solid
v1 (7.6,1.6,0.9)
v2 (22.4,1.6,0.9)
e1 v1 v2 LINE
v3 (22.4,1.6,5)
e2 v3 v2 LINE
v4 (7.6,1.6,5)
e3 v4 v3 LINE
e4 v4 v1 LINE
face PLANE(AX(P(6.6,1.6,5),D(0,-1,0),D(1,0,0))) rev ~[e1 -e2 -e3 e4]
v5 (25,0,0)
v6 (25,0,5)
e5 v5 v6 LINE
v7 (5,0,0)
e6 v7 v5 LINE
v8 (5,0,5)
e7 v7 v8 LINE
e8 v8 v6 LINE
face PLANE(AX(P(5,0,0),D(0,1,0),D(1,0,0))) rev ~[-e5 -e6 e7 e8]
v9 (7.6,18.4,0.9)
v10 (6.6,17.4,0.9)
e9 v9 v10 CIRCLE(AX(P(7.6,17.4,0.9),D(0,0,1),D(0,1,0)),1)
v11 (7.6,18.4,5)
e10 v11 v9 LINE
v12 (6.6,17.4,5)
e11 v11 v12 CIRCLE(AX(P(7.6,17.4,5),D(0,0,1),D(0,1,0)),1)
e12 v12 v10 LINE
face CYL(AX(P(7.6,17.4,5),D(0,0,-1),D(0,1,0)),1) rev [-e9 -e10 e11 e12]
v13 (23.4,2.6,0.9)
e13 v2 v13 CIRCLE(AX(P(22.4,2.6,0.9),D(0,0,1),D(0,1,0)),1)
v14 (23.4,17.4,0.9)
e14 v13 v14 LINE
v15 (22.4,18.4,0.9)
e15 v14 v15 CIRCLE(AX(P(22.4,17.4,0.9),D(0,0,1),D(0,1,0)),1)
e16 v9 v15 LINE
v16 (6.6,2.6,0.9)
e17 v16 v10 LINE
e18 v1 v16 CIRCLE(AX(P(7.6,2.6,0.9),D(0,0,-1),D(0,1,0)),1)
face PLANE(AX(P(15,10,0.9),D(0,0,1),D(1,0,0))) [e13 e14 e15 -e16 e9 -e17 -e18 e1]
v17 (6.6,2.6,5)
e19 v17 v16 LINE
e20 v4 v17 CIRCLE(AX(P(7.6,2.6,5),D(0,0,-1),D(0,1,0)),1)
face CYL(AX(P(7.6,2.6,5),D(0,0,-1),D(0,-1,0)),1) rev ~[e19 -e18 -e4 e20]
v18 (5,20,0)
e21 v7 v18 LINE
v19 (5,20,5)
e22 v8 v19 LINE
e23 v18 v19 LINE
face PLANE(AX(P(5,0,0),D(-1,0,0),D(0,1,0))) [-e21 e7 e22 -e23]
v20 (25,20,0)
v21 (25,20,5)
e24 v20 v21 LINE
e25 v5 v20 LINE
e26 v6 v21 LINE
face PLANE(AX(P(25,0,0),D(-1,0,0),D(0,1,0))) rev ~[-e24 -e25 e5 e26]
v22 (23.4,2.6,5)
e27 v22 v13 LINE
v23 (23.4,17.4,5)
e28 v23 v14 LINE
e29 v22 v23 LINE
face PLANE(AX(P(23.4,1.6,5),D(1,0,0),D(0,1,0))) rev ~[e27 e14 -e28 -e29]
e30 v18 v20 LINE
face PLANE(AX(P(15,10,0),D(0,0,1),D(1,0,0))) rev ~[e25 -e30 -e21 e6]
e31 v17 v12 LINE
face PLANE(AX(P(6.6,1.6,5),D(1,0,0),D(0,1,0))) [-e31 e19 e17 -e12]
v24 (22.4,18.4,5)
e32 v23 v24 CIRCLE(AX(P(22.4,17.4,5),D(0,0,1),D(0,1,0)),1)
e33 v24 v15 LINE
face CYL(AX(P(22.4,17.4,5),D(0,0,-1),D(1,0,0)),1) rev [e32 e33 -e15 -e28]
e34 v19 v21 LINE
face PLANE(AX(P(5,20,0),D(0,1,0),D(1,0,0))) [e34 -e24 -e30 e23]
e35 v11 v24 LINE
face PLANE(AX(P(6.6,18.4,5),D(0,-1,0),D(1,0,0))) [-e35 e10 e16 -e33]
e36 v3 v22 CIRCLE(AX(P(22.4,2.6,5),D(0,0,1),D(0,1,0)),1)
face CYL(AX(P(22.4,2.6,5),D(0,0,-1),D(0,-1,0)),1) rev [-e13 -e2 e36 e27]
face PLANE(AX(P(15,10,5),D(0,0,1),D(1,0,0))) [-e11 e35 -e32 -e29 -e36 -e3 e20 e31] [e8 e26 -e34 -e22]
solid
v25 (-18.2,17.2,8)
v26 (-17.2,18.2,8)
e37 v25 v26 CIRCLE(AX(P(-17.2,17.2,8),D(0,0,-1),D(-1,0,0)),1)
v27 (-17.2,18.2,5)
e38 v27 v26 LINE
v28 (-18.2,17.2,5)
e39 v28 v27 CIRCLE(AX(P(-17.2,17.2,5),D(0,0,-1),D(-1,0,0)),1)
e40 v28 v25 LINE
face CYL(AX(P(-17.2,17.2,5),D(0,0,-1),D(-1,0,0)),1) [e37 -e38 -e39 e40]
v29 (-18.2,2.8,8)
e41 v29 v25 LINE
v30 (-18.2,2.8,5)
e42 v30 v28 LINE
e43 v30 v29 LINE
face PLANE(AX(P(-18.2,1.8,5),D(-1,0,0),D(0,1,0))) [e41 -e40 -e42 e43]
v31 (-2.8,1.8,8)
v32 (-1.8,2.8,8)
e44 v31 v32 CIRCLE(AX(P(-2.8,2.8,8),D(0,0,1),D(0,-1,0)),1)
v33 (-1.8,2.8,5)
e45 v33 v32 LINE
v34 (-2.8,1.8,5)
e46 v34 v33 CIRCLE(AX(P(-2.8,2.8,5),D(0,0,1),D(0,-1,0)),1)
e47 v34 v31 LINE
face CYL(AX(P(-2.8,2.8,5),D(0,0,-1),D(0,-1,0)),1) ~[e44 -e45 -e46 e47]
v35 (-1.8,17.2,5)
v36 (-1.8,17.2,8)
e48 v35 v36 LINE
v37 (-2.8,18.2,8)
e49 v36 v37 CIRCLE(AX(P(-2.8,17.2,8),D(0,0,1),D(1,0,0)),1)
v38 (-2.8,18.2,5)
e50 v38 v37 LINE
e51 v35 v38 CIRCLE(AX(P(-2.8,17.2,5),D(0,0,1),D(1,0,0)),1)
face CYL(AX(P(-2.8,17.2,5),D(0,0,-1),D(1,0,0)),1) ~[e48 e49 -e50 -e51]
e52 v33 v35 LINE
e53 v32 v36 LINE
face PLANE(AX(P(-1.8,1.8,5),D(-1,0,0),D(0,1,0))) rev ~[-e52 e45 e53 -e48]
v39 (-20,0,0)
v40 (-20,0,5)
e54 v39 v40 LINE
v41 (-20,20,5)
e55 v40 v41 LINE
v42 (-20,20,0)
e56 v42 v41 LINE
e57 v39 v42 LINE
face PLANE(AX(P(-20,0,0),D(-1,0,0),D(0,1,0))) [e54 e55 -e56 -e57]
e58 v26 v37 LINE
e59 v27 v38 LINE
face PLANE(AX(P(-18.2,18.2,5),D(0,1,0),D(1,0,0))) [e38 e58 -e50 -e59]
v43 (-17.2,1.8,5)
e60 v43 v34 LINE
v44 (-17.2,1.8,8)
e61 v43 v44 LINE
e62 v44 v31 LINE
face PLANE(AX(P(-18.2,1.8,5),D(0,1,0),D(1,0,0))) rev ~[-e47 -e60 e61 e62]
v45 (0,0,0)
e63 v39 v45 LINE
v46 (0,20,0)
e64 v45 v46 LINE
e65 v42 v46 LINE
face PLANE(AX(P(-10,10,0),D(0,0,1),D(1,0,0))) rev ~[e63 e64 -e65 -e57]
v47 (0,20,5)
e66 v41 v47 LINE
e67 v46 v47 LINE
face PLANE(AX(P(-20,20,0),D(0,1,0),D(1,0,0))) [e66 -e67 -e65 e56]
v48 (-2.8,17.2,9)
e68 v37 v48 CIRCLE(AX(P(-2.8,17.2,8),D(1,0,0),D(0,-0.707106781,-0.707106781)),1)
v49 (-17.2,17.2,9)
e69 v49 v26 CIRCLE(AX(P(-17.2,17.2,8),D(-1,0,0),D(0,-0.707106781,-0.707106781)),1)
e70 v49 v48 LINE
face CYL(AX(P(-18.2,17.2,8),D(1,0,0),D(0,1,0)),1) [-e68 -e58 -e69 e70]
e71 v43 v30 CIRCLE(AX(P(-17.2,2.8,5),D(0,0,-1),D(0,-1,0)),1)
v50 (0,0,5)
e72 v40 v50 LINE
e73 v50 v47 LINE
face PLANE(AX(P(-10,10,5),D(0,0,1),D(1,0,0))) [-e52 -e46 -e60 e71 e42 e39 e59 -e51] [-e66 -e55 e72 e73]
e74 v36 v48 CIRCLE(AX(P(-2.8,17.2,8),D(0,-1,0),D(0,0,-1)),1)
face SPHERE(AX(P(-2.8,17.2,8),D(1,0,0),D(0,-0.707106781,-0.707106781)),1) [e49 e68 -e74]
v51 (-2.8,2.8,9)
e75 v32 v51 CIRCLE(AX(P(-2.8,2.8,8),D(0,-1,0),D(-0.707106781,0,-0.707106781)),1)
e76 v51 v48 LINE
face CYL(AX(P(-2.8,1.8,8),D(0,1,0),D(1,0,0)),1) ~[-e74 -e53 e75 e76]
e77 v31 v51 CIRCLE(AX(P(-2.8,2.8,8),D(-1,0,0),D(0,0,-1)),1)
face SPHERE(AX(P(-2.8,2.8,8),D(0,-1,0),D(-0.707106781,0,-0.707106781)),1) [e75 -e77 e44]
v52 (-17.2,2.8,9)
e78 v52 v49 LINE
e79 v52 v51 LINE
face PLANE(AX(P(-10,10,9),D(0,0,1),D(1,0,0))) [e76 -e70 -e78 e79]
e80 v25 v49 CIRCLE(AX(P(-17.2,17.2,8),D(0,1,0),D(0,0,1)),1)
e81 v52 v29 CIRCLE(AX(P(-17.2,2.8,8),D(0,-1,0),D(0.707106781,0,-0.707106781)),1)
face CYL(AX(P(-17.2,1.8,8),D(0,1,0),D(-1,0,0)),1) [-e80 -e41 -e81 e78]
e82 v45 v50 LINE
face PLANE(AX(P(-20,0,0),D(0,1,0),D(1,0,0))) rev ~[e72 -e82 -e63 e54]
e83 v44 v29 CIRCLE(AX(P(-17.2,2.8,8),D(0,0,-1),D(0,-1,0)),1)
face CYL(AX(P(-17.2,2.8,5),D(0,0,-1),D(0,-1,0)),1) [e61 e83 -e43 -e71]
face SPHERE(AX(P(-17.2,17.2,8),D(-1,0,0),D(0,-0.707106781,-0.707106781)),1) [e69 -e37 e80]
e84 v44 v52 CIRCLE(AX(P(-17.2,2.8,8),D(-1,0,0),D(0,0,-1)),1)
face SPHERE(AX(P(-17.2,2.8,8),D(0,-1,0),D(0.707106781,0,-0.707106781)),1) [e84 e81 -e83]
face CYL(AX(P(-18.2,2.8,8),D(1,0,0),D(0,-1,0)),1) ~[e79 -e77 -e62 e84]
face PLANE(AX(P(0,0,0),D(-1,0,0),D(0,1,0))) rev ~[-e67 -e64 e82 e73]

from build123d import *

# Parameters (mm, degrees)
F0_W         = 20
F0_H         = 20
F1_DEPTH     = 5
F2_W         = 16.4
F2_H         = 16.4
F3_DEPTH     = 4
F4_R         = 1
F5_W         = 20
F5_H         = 20
F6_DEPTH     = 5
F7_W         = 16.8
F7_H         = 16.8
F8_DEPTH     = 4.1
F9_T1_DEPTH  = 3
F9_S5_W      = 1
F9_S5_H      = 1
F9_T6_DEPTH  = 1
F9_S11_W     = 1
F9_S11_H     = 1
F9_T12_DEPTH = 1
F9_S17_W     = 1
F9_S17_H     = 1
F9_T18_DEPTH = 1
F9_S23_W     = 1
F9_S23_H     = 1
F9_T24_DEPTH = 1
F10_R        = 1


# Not quite as in the source:
# - a fillet or chamfer that OpenCascade refuses, or shapes differently, is made with other operations: its cross-section is extruded or revolved along the edge and cut away or added


with BuildPart() as f1:
    # F0 (on Top) → F1 (new body)
    with BuildSketch(Plane.XY):
        with Locations((-10, 10)):
            Rectangle(F0_W, F0_H)
    extrude(amount=F1_DEPTH)

    # F2 (on face) → F3 (join)
    with BuildSketch(Plane.XY.offset(5)):
        with Locations((-10, 10)):
            Rectangle(F2_W, F2_H)
    extrude(amount=F3_DEPTH)

    # F4
    f4_edges = [f1.edges().sort_by_distance(p)[0] for p in [
        (-10, 1.8, 9),
        (-1.8, 10, 9),
        (-10, 18.2, 9),
        (-18.2, 10, 9),
    ]]
    fillet(f4_edges, radius=F4_R)

    # F9: fillet of radius 1 on 4 edges, made by hand

    # F9_s2 → F9_t1 (cut)
    with BuildSketch(Plane.XY.offset(5)):
        with BuildLine():
            ThreePointArc((-1.8, 17.2), (-2.0928932188, 17.9071067812), (-2.8, 18.2))
            Line((-2.8, 18.2), (-1.8, 18.2))
            Line((-1.8, 18.2), (-1.8, 17.2))
        make_face()
        with BuildLine():
            ThreePointArc((-2.8, 1.8), (-2.0928932188, 2.0928932188), (-1.8, 2.8))
            Line((-1.8, 2.8), (-1.8, 1.8))
            Line((-1.8, 1.8), (-2.8, 1.8))
        make_face()
        with BuildLine():
            ThreePointArc((-17.2, 1.8), (-17.9071067812, 2.0928932188), (-18.2, 2.8))
            Line((-18.2, 2.8), (-18.2, 1.8))
            Line((-18.2, 1.8), (-17.2, 1.8))
        make_face()
        with BuildLine():
            ThreePointArc((-18.2, 17.2), (-17.9071067812, 17.9071067812), (-17.2, 18.2))
            Line((-17.2, 18.2), (-18.2, 18.2))
            Line((-18.2, 18.2), (-18.2, 17.2))
        make_face()
    extrude(amount=F9_T1_DEPTH, mode=Mode.SUBTRACT)


with BuildPart() as f6:
    # F5 (on Top) → F6 (new body)
    with BuildSketch(Plane.XY):
        with Locations((15, 10)):
            Rectangle(F5_W, F5_H)
    extrude(amount=F6_DEPTH)

    # F7 (on face) → F8 (cut)
    with BuildSketch(Plane.XY.offset(5)):
        with Locations((15, 10)):
            Rectangle(F7_W, F7_H)
    extrude(amount=-F8_DEPTH, mode=Mode.SUBTRACT)

    # F10
    f10_edges = [f6.edges().sort_by_distance(p)[0] for p in [
        (6.6, 18.4, 2.95),
        (23.4, 18.4, 2.95),
        (23.4, 1.6, 2.95),
        (6.6, 1.6, 2.95),
    ]]
    fillet(f10_edges, radius=F10_R)


with BuildPart() as f9_tool4:
    # F9_s5 → F9_t6 (new body)
    with BuildSketch(Plane.YZ.offset(-17.2)):
        with Locations((17.7, 8.5)):
            Rectangle(F9_S5_W, F9_S5_H)
    extrude(amount=-F9_T6_DEPTH)

    # F9_s7 → F9_t8 (revolve, cut)
    with BuildSketch(Plane(origin=(-17.2, 17.2, 8), x_dir=(0, -0.7071067812, -0.7071067812), z_dir=(0, 0.7071067812, -0.7071067812))):
        with BuildLine():
            ThreePointArc((0, -1), (1, 0), (0, 1))
            Line((0, 1), (0, -1))
        make_face()
    revolve(axis=Axis((-17.2, 17.2, 8), (-1, 0, 0)), mode=Mode.SUBTRACT)


with BuildPart() as f1_1:
    add(f1.part)

    # F9_t3: cut F9_tool4
    add(f9_tool4.part, mode=Mode.SUBTRACT)


with BuildPart() as f9_tool10:
    # F9_s11 → F9_t12 (new body)
    with BuildSketch(Plane.XZ.offset(-2.8)):
        with Locations((-17.7, 8.5)):
            Rectangle(F9_S11_W, F9_S11_H)
    extrude(amount=F9_T12_DEPTH)

    # F9_s13 → F9_t14 (revolve, cut)
    with BuildSketch(Plane(origin=(-17.2, 2.8, 8), x_dir=(0.7071067812, 0, -0.7071067812), z_dir=(-0.7071067812, 0, -0.7071067812))):
        with BuildLine():
            ThreePointArc((0, -1), (1, 0), (0, 1))
            Line((0, 1), (0, -1))
        make_face()
    revolve(axis=Axis((-17.2, 2.8, 8), (0, -1, 0)), mode=Mode.SUBTRACT)


with BuildPart() as f1_2:
    add(f1_1.part)

    # F9_t9: cut F9_tool10
    add(f9_tool10.part, mode=Mode.SUBTRACT)


with BuildPart() as f9_tool16:
    # F9_s17 → F9_t18 (new body)
    with BuildSketch(Plane.XZ.offset(-2.8)):
        with Locations((-2.3, 8.5)):
            Rectangle(F9_S17_W, F9_S17_H)
    extrude(amount=F9_T18_DEPTH)

    # F9_s19 → F9_t20 (revolve, cut)
    with BuildSketch(Plane(origin=(-2.8, 2.8, 8), x_dir=(-0.7071067812, 0, -0.7071067812), z_dir=(-0.7071067812, 0, 0.7071067812))):
        with BuildLine():
            ThreePointArc((0, -1), (1, 0), (0, 1))
            Line((0, 1), (0, -1))
        make_face()
    revolve(axis=Axis((-2.8, 2.8, 8), (0, -1, 0)), mode=Mode.SUBTRACT)


with BuildPart() as f1_3:
    add(f1_2.part)

    # F9_t15: cut F9_tool16
    add(f9_tool16.part, mode=Mode.SUBTRACT)


with BuildPart() as f9_tool22:
    # F9_s23 → F9_t24 (new body)
    with BuildSketch(Plane.YZ.offset(-2.8)):
        with Locations((17.7, 8.5)):
            Rectangle(F9_S23_W, F9_S23_H)
    extrude(amount=F9_T24_DEPTH)

    # F9_s25 → F9_t26 (revolve, cut)
    with BuildSketch(Plane(origin=(-2.8, 17.2, 8), x_dir=(0, -0.7071067812, -0.7071067812), z_dir=(0, -0.7071067812, 0.7071067812))):
        with BuildLine():
            ThreePointArc((0, -1), (1, 0), (0, 1))
            Line((0, 1), (0, -1))
        make_face()
    revolve(axis=Axis((-2.8, 17.2, 8), (1, 0, 0)), mode=Mode.SUBTRACT)


with BuildPart() as f1_4:
    add(f1_3.part)

    # F9_t21: cut F9_tool22
    add(f9_tool22.part, mode=Mode.SUBTRACT)


solid = Compound([f6.part, f1_4.part])
